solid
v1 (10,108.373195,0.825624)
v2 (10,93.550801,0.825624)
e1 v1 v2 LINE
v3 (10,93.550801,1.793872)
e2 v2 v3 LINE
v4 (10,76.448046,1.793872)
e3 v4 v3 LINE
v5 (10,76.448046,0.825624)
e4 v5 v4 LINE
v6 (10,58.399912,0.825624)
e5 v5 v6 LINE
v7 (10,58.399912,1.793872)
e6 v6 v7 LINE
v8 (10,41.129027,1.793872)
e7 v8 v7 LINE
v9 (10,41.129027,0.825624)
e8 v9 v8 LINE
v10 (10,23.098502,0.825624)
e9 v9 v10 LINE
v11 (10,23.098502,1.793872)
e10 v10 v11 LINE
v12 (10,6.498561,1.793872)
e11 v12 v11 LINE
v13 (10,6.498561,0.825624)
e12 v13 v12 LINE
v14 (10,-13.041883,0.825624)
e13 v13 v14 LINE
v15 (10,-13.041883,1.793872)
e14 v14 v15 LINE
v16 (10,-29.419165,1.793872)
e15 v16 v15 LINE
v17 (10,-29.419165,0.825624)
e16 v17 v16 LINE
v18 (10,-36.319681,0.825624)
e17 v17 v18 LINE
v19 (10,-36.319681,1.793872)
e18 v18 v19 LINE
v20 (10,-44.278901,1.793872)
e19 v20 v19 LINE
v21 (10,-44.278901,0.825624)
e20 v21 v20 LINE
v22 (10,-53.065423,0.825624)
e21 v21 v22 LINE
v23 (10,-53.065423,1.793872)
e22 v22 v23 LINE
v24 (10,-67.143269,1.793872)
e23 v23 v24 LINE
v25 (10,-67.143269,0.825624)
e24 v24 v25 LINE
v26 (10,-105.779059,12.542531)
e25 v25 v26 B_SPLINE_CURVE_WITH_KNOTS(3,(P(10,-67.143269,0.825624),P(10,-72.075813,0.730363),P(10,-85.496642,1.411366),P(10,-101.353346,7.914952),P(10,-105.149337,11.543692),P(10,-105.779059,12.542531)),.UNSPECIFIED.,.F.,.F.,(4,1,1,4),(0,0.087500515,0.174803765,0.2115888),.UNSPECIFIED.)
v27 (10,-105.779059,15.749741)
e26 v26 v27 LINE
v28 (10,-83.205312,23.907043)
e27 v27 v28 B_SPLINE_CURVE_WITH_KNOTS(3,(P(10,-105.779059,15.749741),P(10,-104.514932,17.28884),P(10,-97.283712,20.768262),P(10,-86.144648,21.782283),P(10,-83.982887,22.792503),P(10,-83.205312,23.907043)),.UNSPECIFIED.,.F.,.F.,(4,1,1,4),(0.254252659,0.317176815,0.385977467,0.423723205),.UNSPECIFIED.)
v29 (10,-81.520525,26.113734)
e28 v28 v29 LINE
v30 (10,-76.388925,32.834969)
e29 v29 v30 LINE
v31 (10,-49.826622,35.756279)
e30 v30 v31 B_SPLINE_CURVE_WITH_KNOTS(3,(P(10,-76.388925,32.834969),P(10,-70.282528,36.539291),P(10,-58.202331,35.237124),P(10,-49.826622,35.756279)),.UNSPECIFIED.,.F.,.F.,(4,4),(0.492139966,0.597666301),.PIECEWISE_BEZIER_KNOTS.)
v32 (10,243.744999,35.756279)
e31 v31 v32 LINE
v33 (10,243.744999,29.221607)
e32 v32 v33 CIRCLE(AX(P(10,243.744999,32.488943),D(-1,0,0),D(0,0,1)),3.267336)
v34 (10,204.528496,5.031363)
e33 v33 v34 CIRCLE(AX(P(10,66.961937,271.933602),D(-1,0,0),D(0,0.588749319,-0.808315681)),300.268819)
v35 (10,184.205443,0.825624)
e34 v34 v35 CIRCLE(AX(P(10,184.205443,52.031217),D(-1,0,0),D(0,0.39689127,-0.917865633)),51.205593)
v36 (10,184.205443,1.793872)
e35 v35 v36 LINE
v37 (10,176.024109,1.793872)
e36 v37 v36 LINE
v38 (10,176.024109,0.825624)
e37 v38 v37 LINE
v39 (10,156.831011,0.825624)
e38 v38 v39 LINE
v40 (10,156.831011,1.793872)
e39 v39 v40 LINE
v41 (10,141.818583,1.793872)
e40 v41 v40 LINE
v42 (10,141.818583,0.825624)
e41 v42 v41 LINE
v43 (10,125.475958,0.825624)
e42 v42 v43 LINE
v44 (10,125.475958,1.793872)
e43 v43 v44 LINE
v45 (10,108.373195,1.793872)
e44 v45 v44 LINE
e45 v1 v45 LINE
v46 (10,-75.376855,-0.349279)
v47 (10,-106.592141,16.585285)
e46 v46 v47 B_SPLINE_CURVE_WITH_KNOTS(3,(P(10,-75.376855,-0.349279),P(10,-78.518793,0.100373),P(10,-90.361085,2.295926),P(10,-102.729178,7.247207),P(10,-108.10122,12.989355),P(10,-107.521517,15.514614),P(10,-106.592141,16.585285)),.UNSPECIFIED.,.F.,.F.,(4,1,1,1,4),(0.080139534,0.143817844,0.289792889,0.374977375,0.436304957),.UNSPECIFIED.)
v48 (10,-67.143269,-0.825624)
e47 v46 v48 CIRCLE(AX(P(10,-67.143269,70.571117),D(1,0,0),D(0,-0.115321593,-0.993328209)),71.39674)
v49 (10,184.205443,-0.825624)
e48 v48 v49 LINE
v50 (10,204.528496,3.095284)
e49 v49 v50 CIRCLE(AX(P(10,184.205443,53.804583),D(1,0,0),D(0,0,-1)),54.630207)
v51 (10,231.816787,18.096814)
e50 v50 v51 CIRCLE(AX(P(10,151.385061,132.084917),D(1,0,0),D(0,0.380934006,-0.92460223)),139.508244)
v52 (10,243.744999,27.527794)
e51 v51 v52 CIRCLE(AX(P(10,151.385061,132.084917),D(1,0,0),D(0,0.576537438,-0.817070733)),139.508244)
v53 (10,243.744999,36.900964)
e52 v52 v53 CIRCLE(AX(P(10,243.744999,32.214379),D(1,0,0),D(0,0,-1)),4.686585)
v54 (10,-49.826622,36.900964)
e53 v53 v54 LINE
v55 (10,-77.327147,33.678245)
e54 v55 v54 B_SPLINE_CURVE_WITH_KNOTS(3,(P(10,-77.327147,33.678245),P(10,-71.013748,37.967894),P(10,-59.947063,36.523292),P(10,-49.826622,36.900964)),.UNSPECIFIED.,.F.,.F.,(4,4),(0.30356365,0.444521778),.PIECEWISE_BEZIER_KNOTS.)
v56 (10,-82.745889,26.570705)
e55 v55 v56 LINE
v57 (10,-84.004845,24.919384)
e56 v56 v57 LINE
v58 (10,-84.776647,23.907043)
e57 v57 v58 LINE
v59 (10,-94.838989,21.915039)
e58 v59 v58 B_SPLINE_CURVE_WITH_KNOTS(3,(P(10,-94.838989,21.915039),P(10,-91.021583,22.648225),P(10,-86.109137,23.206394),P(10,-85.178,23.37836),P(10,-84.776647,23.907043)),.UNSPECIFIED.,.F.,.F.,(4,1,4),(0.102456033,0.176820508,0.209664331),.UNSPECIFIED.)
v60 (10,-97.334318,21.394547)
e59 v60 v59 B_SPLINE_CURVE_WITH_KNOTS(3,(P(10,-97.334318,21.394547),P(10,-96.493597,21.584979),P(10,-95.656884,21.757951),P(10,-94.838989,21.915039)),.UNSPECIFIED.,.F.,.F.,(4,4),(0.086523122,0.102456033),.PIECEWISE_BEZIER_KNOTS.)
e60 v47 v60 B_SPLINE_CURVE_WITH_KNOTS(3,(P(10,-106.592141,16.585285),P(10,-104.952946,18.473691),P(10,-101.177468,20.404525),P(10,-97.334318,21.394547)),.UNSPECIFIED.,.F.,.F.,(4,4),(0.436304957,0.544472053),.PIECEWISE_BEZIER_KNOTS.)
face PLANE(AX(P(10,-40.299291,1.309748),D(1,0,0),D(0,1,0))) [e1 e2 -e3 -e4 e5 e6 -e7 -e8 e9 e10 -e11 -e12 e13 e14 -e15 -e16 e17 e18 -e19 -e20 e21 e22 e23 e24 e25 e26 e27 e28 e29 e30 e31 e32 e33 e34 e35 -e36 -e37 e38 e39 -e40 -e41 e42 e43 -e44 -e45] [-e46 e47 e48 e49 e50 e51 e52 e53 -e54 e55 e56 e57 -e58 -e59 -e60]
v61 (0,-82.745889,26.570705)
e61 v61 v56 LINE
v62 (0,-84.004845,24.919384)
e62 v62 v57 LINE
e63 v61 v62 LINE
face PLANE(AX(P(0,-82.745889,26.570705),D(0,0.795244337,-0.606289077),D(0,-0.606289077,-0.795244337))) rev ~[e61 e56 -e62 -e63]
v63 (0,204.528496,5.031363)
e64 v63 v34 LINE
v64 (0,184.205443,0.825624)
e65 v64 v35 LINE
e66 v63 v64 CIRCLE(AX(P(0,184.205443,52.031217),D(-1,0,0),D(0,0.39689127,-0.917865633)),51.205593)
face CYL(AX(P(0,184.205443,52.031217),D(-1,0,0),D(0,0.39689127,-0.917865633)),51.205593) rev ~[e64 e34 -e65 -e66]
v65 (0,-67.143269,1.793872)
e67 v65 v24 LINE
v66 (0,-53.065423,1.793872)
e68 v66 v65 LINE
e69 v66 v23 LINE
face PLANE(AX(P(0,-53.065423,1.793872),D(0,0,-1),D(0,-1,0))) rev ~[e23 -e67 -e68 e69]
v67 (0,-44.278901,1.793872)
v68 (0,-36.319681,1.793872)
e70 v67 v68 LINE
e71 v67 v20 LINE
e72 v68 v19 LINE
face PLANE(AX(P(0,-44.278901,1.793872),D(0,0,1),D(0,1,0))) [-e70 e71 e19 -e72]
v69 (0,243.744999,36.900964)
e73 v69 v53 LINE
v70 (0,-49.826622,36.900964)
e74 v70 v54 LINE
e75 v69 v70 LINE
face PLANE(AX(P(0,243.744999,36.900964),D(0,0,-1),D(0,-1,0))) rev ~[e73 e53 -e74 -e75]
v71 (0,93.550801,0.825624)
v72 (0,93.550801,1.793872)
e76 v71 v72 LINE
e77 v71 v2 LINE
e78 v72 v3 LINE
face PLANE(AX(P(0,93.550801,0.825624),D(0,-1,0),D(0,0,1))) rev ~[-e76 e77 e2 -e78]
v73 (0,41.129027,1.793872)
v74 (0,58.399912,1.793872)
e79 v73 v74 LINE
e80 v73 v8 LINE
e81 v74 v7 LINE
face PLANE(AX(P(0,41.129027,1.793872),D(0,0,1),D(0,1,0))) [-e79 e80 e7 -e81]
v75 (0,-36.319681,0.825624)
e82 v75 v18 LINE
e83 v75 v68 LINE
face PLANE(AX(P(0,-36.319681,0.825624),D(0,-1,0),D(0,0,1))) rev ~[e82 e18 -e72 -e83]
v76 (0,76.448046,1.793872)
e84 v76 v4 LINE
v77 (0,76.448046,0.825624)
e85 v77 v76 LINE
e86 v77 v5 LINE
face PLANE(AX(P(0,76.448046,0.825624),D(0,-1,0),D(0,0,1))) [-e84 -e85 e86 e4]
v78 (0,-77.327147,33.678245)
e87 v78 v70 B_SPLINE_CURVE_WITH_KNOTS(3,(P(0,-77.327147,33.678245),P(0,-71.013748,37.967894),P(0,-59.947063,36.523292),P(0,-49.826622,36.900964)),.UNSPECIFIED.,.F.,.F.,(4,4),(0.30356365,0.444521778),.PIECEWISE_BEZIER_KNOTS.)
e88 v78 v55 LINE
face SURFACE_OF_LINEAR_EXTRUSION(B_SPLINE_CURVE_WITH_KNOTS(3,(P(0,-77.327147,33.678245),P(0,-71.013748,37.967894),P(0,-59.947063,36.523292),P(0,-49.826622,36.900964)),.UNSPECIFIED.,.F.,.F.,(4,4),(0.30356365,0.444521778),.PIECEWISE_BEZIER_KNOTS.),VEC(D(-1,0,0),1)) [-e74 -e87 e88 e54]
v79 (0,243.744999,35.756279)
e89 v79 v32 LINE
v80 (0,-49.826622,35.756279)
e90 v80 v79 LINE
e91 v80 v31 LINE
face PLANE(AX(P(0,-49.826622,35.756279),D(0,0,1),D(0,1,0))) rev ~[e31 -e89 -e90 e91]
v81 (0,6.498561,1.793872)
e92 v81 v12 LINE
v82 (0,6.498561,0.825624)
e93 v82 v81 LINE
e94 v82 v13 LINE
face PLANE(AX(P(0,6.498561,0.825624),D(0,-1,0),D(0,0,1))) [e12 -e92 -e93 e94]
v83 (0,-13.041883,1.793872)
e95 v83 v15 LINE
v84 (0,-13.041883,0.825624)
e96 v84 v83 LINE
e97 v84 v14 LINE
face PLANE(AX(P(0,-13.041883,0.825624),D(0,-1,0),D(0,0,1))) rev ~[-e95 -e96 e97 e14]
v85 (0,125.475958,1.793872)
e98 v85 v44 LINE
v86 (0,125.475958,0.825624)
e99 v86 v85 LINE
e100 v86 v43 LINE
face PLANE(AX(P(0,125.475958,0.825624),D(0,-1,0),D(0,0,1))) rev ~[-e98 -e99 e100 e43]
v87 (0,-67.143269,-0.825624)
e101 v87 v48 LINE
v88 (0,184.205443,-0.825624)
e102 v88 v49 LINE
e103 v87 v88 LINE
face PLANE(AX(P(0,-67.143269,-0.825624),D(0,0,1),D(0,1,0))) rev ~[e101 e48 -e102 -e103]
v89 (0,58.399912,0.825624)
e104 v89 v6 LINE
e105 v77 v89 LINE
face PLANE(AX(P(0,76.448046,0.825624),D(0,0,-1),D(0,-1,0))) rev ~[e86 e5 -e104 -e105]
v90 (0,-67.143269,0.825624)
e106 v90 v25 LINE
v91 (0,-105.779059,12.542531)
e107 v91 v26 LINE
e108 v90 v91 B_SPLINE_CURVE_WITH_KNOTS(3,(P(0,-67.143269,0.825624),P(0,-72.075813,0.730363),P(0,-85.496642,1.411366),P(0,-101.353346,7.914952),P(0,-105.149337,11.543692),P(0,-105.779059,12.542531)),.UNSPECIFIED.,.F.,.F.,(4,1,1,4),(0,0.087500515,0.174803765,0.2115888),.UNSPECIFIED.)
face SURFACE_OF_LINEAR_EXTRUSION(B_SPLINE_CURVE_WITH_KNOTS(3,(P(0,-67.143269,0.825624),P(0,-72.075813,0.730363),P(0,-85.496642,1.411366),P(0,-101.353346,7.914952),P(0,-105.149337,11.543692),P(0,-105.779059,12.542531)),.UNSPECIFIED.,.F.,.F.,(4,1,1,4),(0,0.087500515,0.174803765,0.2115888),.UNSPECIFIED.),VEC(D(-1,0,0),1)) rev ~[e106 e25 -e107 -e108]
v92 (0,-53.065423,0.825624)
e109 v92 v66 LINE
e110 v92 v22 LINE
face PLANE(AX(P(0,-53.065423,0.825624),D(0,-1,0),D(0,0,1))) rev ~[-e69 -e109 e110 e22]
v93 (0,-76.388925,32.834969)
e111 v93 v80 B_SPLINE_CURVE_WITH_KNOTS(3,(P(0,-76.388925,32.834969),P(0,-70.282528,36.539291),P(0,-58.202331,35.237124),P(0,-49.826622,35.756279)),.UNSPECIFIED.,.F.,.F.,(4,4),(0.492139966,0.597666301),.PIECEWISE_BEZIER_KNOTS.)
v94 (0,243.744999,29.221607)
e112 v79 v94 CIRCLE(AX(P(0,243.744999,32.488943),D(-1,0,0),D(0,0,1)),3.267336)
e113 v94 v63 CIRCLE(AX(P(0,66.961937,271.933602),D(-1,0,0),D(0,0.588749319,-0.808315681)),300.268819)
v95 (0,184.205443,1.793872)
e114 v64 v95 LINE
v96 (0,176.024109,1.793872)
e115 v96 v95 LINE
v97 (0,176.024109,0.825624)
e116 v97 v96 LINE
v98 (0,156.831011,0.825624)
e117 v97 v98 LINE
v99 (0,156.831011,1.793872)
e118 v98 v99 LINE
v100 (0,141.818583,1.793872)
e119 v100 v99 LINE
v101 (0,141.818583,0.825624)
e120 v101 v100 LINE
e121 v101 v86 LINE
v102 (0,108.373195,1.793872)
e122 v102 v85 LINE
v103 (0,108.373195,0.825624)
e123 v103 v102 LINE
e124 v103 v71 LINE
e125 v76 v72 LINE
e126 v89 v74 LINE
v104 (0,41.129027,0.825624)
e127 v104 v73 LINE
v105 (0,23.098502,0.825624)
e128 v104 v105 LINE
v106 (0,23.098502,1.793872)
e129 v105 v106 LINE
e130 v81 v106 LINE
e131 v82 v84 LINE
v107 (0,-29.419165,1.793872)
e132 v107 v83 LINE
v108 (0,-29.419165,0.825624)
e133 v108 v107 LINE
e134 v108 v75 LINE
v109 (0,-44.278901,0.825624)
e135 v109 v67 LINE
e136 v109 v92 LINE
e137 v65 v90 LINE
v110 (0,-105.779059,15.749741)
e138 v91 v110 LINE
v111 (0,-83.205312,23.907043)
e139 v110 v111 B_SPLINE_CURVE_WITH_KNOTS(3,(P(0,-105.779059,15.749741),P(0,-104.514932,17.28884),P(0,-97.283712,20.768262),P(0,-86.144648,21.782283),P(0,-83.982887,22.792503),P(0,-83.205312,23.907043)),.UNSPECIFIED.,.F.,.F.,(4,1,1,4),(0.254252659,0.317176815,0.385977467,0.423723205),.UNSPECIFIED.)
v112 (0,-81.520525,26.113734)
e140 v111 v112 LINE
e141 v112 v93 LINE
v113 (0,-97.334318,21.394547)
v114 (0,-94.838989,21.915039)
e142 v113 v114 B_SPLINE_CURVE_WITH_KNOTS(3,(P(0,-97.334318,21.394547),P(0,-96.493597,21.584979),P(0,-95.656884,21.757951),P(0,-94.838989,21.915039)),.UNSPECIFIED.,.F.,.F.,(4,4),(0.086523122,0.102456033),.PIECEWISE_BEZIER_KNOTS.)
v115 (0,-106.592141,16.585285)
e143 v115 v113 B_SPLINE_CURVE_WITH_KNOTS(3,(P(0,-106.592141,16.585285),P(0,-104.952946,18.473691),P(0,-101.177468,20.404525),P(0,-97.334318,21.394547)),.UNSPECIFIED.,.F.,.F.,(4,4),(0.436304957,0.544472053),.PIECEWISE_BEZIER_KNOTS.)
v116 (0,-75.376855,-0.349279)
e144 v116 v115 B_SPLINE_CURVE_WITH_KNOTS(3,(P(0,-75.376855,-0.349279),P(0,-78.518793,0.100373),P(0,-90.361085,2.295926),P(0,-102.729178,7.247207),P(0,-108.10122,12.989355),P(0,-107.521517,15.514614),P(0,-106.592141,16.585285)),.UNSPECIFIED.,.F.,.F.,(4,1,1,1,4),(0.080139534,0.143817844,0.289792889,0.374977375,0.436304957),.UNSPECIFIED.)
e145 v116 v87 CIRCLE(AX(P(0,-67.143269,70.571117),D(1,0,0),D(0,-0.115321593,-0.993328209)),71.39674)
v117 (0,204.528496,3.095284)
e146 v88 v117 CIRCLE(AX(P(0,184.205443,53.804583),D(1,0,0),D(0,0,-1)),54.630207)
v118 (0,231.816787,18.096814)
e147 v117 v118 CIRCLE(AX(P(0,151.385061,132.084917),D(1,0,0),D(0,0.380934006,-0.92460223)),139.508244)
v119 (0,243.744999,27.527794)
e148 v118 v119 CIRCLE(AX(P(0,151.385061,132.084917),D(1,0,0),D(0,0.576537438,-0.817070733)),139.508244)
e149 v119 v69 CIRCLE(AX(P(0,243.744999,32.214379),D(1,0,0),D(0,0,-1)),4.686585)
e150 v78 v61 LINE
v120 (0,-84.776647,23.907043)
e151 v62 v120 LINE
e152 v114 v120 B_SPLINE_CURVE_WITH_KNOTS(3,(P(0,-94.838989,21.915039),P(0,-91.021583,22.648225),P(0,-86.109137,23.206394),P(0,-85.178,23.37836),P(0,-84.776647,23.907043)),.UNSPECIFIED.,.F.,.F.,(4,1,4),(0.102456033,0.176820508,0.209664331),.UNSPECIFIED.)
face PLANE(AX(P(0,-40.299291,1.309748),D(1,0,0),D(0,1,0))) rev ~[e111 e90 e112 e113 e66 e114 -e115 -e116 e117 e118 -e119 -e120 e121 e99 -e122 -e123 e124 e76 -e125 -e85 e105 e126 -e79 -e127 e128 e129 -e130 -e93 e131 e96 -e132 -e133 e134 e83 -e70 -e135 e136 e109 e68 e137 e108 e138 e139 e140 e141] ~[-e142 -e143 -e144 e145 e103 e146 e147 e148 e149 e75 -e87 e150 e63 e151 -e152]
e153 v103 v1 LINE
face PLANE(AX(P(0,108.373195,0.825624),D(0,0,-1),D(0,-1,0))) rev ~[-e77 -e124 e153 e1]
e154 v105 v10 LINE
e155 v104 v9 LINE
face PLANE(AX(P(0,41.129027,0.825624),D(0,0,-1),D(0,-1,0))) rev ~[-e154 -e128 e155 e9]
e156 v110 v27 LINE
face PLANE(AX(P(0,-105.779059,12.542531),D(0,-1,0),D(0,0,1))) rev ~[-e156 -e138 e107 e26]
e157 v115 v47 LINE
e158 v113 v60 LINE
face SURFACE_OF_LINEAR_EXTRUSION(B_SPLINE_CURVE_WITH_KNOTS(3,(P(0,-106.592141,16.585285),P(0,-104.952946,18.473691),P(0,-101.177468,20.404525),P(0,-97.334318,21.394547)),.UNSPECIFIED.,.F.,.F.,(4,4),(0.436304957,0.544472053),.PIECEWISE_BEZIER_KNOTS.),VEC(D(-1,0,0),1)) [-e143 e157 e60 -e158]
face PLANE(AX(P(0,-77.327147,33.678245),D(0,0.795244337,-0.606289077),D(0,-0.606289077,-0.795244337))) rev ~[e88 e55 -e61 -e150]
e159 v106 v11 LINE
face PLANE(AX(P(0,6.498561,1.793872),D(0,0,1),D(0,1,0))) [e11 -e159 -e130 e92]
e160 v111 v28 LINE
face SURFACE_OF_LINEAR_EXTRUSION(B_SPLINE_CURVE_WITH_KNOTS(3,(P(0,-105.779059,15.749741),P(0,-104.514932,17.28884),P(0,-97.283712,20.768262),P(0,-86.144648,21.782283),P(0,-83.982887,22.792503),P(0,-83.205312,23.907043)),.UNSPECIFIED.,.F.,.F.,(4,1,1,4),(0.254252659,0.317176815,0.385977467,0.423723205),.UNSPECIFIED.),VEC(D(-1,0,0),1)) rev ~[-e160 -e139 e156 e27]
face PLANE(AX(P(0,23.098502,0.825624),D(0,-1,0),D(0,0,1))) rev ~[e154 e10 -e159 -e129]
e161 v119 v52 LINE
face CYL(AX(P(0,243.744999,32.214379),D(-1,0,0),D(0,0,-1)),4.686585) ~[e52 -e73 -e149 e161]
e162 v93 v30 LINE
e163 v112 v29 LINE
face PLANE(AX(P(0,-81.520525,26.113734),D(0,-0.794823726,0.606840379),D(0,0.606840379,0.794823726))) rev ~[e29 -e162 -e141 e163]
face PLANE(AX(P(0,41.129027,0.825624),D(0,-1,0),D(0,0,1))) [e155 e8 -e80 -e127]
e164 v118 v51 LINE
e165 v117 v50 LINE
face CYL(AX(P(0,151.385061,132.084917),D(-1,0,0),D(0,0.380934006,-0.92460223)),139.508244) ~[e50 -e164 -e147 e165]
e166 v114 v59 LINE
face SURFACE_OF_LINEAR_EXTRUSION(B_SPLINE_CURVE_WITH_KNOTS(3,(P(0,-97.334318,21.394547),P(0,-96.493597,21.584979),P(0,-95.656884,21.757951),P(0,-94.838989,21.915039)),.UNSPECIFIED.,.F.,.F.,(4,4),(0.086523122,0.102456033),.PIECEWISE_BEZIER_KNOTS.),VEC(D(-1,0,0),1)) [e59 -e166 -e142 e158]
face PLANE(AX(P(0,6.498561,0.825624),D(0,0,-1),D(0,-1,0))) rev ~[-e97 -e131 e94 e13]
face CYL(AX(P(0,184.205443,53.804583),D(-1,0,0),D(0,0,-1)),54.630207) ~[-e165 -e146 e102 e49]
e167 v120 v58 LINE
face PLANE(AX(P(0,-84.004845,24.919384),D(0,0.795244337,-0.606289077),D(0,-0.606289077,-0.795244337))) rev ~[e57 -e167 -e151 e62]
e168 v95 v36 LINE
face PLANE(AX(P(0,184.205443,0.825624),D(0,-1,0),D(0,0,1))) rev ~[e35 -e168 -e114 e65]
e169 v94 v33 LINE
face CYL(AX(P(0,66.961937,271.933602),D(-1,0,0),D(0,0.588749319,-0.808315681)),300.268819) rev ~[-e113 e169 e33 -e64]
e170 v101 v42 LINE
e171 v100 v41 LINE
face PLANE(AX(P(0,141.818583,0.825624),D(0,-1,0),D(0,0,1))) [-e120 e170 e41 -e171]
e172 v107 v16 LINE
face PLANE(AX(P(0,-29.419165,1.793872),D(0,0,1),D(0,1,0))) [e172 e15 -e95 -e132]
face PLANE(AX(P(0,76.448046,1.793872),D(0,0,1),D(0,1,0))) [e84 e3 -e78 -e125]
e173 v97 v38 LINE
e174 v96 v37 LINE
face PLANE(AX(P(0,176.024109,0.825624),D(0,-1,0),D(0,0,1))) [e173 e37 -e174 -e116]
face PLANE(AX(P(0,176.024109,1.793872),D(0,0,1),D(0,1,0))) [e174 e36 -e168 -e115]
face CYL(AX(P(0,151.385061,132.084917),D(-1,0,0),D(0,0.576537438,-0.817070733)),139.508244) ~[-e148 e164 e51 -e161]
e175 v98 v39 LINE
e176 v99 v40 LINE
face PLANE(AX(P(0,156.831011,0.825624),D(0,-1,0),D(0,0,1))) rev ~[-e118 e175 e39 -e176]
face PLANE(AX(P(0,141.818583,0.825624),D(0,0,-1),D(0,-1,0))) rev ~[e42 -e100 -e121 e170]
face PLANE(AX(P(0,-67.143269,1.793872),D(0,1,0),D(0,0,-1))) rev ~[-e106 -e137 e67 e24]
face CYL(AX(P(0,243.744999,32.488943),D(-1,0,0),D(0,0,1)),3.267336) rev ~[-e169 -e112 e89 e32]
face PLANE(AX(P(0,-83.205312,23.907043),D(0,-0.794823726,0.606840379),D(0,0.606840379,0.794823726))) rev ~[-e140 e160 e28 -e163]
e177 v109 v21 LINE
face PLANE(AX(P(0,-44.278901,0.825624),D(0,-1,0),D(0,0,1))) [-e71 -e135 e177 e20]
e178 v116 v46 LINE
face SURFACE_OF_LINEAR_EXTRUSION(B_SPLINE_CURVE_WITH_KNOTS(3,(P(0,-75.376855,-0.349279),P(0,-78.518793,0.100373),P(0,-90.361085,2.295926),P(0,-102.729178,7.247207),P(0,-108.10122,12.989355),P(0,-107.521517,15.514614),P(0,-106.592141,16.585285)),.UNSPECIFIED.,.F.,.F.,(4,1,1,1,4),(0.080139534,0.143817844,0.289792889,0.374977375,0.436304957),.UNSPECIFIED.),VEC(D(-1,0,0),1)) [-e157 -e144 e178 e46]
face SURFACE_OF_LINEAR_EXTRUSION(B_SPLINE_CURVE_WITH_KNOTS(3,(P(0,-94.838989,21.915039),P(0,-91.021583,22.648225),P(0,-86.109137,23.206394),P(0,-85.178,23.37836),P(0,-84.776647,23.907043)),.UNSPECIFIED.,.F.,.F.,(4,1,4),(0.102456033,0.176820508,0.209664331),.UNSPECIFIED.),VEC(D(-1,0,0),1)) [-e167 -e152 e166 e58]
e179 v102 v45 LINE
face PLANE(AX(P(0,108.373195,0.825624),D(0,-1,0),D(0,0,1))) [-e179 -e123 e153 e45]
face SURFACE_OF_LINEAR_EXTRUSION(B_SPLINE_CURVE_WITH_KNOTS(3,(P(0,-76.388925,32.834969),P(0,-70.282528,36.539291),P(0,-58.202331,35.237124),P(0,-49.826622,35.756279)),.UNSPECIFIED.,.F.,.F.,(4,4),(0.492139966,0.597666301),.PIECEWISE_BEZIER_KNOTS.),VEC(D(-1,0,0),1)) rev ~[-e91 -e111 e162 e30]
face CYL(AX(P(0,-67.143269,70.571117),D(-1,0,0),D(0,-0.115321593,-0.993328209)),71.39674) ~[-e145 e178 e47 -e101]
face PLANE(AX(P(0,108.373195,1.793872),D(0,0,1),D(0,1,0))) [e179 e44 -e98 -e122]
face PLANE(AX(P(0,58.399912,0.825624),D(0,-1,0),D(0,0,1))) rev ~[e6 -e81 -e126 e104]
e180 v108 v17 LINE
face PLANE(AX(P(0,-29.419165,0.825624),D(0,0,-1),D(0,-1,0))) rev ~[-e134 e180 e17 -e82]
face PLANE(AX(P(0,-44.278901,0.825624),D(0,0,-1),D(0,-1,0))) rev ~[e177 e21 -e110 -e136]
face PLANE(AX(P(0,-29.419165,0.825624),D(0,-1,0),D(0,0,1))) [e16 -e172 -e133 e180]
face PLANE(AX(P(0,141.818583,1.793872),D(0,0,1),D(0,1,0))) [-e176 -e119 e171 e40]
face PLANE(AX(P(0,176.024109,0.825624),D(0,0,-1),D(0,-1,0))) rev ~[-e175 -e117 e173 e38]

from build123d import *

# Parameters (mm, degrees)
F0_W     = 7.9592205584
F0_H     = 0.9682481177
F0_W_2   = 16.3772823289
F0_W_3   = 16.5999415331
F0_W_4   = 59.5395565033
F0_H_2   = 1.1446848512
F0_W_5   = 17.2708854079
F0_W_6   = 17.1027556062
F0_W_7   = 8.1813335419
F0_W_8   = 17.1027630568
F0_W_9   = 15.0124281645
F1_DEPTH = 10


with BuildPart() as f1:
    # F0 (on Right) → F1 (new body)
    with BuildSketch(Plane.YZ):
        with Locations((-40.2992907912, 1.3097476913)):
            Rectangle(F0_W, F0_H)
        with BuildLine():
            Line((-36.319680512, 0.8256236324), (-44.2789010704, 0.8256236324))
            Line((-44.2789010704, 0.8256236324), (-47.2884887369, 0.8256236324))
            add(Edge.make_bspline(
                [(-47.2884887369, 0.8256236324), (-51.1986791226, -0.4227987286), (-54.7682639191, 0.488674187), (-57.7987805009, 0.8256236324)],
                knots=[0.8788153386, 0.8788153386, 0.8788153386, 0.8788153386, 0.9375977313, 0.9375977313, 0.9375977313, 0.9375977313], degree=3))
            Line((-57.7987805009, 0.8256236324), (-67.1432688832, 0.8256236324))
            add(Edge.make_bspline(
                [(-67.1432688832, 0.8256236324), (-66.6509193776, -0.3373995266), (-66.5816717743, -0.6583984415), (-67.1432688832, -0.8256236324)],
                knots=[0.9569663892, 0.9569663892, 0.9569663892, 0.9569663892, 1, 1, 1, 1], degree=3))
            Line((-67.1432688832, -0.8256236324), (67.1432688832, -0.8256236324))
            Line((67.1432688832, -0.8256236324), (67.1432688832, 0.8256236324))
            Line((67.1432688832, 0.8256236324), (58.3999119699, 0.8256236324))
            Line((58.3999119699, 0.8256236324), (41.129026562, 0.8256236324))
            Line((41.129026562, 0.8256236324), (23.0985023081, 0.8256236324))
            Line((23.0985023081, 0.8256236324), (6.4985607751, 0.8256236324))
            Line((6.4985607751, 0.8256236324), (-13.0418827757, 0.8256236324))
            Line((-13.0418827757, 0.8256236324), (-29.4191651046, 0.8256236324))
            Line((-29.4191651046, 0.8256236324), (-36.319680512, 0.8256236324))
        make_face()
        with BuildLine():
            add(Edge.make_bspline(
                [(-47.2884887369, 0.8256236324), (-51.1986791226, -0.4227987286), (-54.7682639191, 0.488674187), (-57.7987805009, 0.8256236324)],
                knots=[0.8788153386, 0.8788153386, 0.8788153386, 0.8788153386, 0.9375977313, 0.9375977313, 0.9375977313, 0.9375977313], degree=3))
            Line((-47.2884887369, 0.8256236324), (-53.0654229224, 0.8256236324))
            Line((-53.0654229224, 0.8256236324), (-57.7987805009, 0.8256236324))
        make_face()
        with Locations((-21.2305239402, 1.3097476913)):
            Rectangle(F0_W_2, F0_H)
        with BuildLine():
            Line((-57.7987805009, 0.8256236324), (-53.0654229224, 0.8256236324))
            Line((-53.0654229224, 0.8256236324), (-53.0654229224, 1.7938717501))
            Line((-53.0654229224, 1.7938717501), (-67.1432688832, 1.7938717501))
            Line((-67.1432688832, 1.7938717501), (-67.1432688832, 0.8256236324))
            add(Edge.make_bspline(
                [(-57.7987805009, 0.8256236324), (-61.0159191969, 1.1833227475), (-63.6255527419, 0.8935602649), (-67.1432688832, 0.8256236324)],
                knots=[0.9375977313, 0.9375977313, 0.9375977313, 0.9375977313, 1, 1, 1, 1], degree=3))
        make_face()
        with BuildLine():
            Line((-67.1432688832, 0.8256236324), (-57.7987805009, 0.8256236324))
            add(Edge.make_bspline(
                [(-57.7987805009, 0.8256236324), (-61.0159191969, 1.1833227475), (-63.6255527419, 0.8935602649), (-67.1432688832, 0.8256236324)],
                knots=[0.9375977313, 0.9375977313, 0.9375977313, 0.9375977313, 1, 1, 1, 1], degree=3))
        make_face()
        with BuildLine():
            add(Edge.make_bspline(
                [(-67.1432688832, 0.8256236324), (-66.6509193776, -0.3373995266), (-66.5816717743, -0.6583984415), (-67.1432688832, -0.8256236324)],
                knots=[0.9569663892, 0.9569663892, 0.9569663892, 0.9569663892, 1, 1, 1, 1], degree=3))
            Line((-67.1432688832, 0.8256236324), (-67.1432688832, -0.8256236324))
        make_face()
        with BuildLine():
            Line((-67.1432688832, -0.8256236324), (-67.1432688832, 0.8256236324))
            add(Edge.make_bspline(
                [(-67.1432688832, 0.8256236324), (-72.0758134657, 0.7303628282), (-85.4966418977, 1.4113661542), (-101.3533463283, 7.9149516327), (-105.1493369808, 11.5436915404), (-105.7790592313, 12.5425305242)],
                knots=[0, 0, 0, 0, 0.0875005146, 0.1748037653, 0.2115887997, 0.2115887997, 0.2115887997, 0.2115887997], degree=3))
            add(Edge.make_bspline(
                [(-105.7790592313, 12.5425305242), (-105.9744112307, 12.8523896605), (-106.4393049893, 13.8046586359), (-106.4279219113, 14.6656665162), (-106.1115412671, 15.2586876195)],
                knots=[0.2115887997, 0.2115887997, 0.2115887997, 0.2115887997, 0.2230002275, 0.2475165519, 0.2475165519, 0.2475165519, 0.2475165519], degree=3))
            add(Edge.make_bspline(
                [(-106.1115412671, 15.2586876195), (-106.4280364897, 15.7186574339), (-106.5937697782, 16.1640910139), (-106.5921410918, 16.585284844)],
                knots=[0.9836293826, 0.9836293826, 0.9836293826, 0.9836293826, 1, 1, 1, 1], degree=3))
            add(Edge.make_bspline(
                [(-75.376854734, -0.3492794788), (-78.5187930994, 0.100372638), (-90.3610848386, 2.295926245), (-102.7291777595, 7.2472073243), (-108.1012203128, 12.9893553032), (-107.5215165975, 15.5146137824), (-106.5921410918, 16.585284844)],
                knots=[0.0801395338, 0.0801395338, 0.0801395338, 0.0801395338, 0.1438178441, 0.2897928885, 0.3749773752, 0.4363049571, 0.4363049571, 0.4363049571, 0.4363049571], degree=3))
            ThreePointArc((-75.376854734, -0.3492794788), (-71.2669456321, -0.7064381134), (-67.1432688832, -0.8256236324))
        make_face()
        with Locations((14.7985315416, 1.3097476913)):
            Rectangle(F0_W_3, F0_H)
        with BuildLine():
            Line((-49.8266220093, 35.7562787831), (-29.3324157713, 35.7562787831))
            add(Edge.make_bspline(
                [(-31.3463312427, 36.9009636343), (-30.6162211649, 36.6342598411), (-29.9359409959, 36.264957093), (-29.3600573473, 35.7800296462), (-29.3324157713, 35.7562787831)],
                knots=[0.5476252208, 0.5476252208, 0.5476252208, 0.5476252208, 0.5656279815, 0.5665441357, 0.5665441357, 0.5665441357, 0.5665441357], degree=3))
            Line((-31.3463312427, 36.9009636343), (-41.4767201262, 36.9009636343))
            add(Edge.make_bspline(
                [(-49.8266220093, 35.7562787831), (-46.6034582942, 35.95606144), (-43.9288870011, 36.4255610772), (-41.4767201262, 36.9009636343)],
                knots=[0.5976663005, 0.5976663005, 0.5976663005, 0.5976663005, 0.6382752389, 0.6382752389, 0.6382752389, 0.6382752389], degree=3))
        make_face()
        with BuildLine():
            add(Edge.make_bspline(
                [(-31.3463312427, 36.9009636343), (-30.6162211649, 36.6342598411), (-29.9359409959, 36.264957093), (-29.3600573473, 35.7800296462), (-29.3324157713, 35.7562787831)],
                knots=[0.5476252208, 0.5476252208, 0.5476252208, 0.5476252208, 0.5656279815, 0.5665441357, 0.5665441357, 0.5665441357, 0.5665441357], degree=3))
            Line((-29.3324157713, 35.7562787831), (-27.0790393766, 35.7562787831))
            add(Edge.make_bspline(
                [(-27.9329801586, 36.9009636343), (-27.5874335917, 36.590939793), (-27.2981663641, 36.213302791), (-27.0790393766, 35.7562787831)],
                knots=[0.7220869644, 0.7220869644, 0.7220869644, 0.7220869644, 0.7320653179, 0.7320653179, 0.7320653179, 0.7320653179], degree=3))
            Line((-27.9329801586, 36.9009636343), (-31.3463312427, 36.9009636343))
        make_face()
        with BuildLine():
            add(Edge.make_bspline(
                [(-27.9329801586, 36.9009636343), (-27.5874335917, 36.590939793), (-27.2981663641, 36.213302791), (-27.0790393766, 35.7562787831)],
                knots=[0.7220869644, 0.7220869644, 0.7220869644, 0.7220869644, 0.7320653179, 0.7320653179, 0.7320653179, 0.7320653179], degree=3))
            Line((-27.0790393766, 35.7562787831), (184.205442667, 35.7562787831))
            Line((184.205442667, 35.7562787831), (184.205442667, 36.9009636343))
            Line((184.205442667, 36.9009636343), (-27.9329801586, 36.9009636343))
        make_face()
        with BuildLine():
            Line((-83.2053124905, 23.9070430398), (-81.5205250131, 26.1137338048))
            add(Edge.make_bspline(
                [(-81.8276049313, 26.3324605583), (-81.7285806251, 26.2701481945), (-81.6261511228, 26.1970663843), (-81.5205250131, 26.1137338048)],
                knots=[0.7832802469, 0.7832802469, 0.7832802469, 0.7832802469, 0.7877852316, 0.7877852316, 0.7877852316, 0.7877852316], degree=3))
            add(Edge.make_bspline(
                [(-83.2053124905, 23.9070430398), (-82.7734139474, 24.5261063334), (-82.337894388, 25.3786099624), (-81.8276049313, 26.3324605583)],
                knots=[0.4237232055, 0.4237232055, 0.4237232055, 0.4237232055, 0.4446888147, 0.4446888147, 0.4446888147, 0.4446888147], degree=3))
        make_face()
        with BuildLine():
            add(Edge.make_bspline(
                [(-81.8276049313, 26.3324605583), (-81.7285806251, 26.2701481945), (-81.6261511228, 26.1970663843), (-81.5205250131, 26.1137338048)],
                knots=[0.7832802469, 0.7832802469, 0.7832802469, 0.7832802469, 0.7877852316, 0.7877852316, 0.7877852316, 0.7877852316], degree=3))
            Line((-81.5205250131, 26.1137338048), (-76.3889253139, 32.834969461))
            add(Edge.make_bspline(
                [(-81.8276049313, 26.3324605583), (-80.6726743978, 28.4912964173), (-79.1347380919, 31.1692780126), (-76.3889253139, 32.834969461)],
                knots=[0.4446888147, 0.4446888147, 0.4446888147, 0.4446888147, 0.4921399658, 0.4921399658, 0.4921399658, 0.4921399658], degree=3))
        make_face()
        with BuildLine():
            Line((-105.7790592313, 12.5425305242), (-105.7790592313, 14.8325555243))
            add(Edge.make_bspline(
                [(-105.7790592313, 14.8325555243), (-105.9036909626, 14.9757756925), (-106.0146769352, 15.1179124494), (-106.1115412671, 15.2586876195)],
                knots=[0.978619105, 0.978619105, 0.978619105, 0.978619105, 0.9836293826, 0.9836293826, 0.9836293826, 0.9836293826], degree=3))
            add(Edge.make_bspline(
                [(-105.7790592313, 12.5425305242), (-105.9744112307, 12.8523896605), (-106.4393049893, 13.8046586359), (-106.4279219113, 14.6656665162), (-106.1115412671, 15.2586876195)],
                knots=[0.2115887997, 0.2115887997, 0.2115887997, 0.2115887997, 0.2230002275, 0.2475165519, 0.2475165519, 0.2475165519, 0.2475165519], degree=3))
        make_face()
        with BuildLine():
            add(Edge.make_bspline(
                [(-105.7790592313, 14.8325555243), (-105.9036909626, 14.9757756925), (-106.0146769352, 15.1179124494), (-106.1115412671, 15.2586876195)],
                knots=[0.978619105, 0.978619105, 0.978619105, 0.978619105, 0.9836293826, 0.9836293826, 0.9836293826, 0.9836293826], degree=3))
            Line((-105.7790592313, 14.8325555243), (-105.7790592313, 15.7497413456))
            add(Edge.make_bspline(
                [(-106.1115412671, 15.2586876195), (-106.0246124997, 15.4216261385), (-105.9143855758, 15.5849789536), (-105.7790592313, 15.7497413456)],
                knots=[0.2475165519, 0.2475165519, 0.2475165519, 0.2475165519, 0.2542526589, 0.2542526589, 0.2542526589, 0.2542526589], degree=3))
        make_face()
        with BuildLine():
            Line((-49.8266220093, 36.9009636343), (-49.8266220093, 35.7562787831))
            add(Edge.make_bspline(
                [(-49.8266220093, 35.7562787831), (-46.6034582942, 35.95606144), (-43.9288870011, 36.4255610772), (-41.4767201262, 36.9009636343)],
                knots=[0.5976663005, 0.5976663005, 0.5976663005, 0.5976663005, 0.6382752389, 0.6382752389, 0.6382752389, 0.6382752389], degree=3))
            Line((-41.4767201262, 36.9009636343), (-49.8266220093, 36.9009636343))
        make_face()
        with BuildLine():
            add(Edge.make_bspline(
                [(-76.3889253139, 32.834969461), (-70.2825284986, 36.5392908326), (-58.2023310565, 35.23712383), (-49.8266220093, 35.7562787831)],
                knots=[0.4921399658, 0.4921399658, 0.4921399658, 0.4921399658, 0.5976663005, 0.5976663005, 0.5976663005, 0.5976663005], degree=3))
            Line((-49.8266220093, 35.7562787831), (-49.8266220093, 36.9009636343))
            add(Edge.make_bspline(
                [(-77.3271471262, 33.6782447994), (-71.0137479896, 37.9678944533), (-59.9470632222, 36.5232924918), (-49.8266220093, 36.9009636343)],
                knots=[0.3035636496, 0.3035636496, 0.3035636496, 0.3035636496, 0.4445217782, 0.4445217782, 0.4445217782, 0.4445217782], degree=3))
            Line((-77.3271471262, 33.6782447994), (-82.7458889947, 26.570704936))
            add(Edge.make_bspline(
                [(-82.7458889947, 26.570704936), (-82.6409378067, 26.595297775), (-82.3634844697, 26.6047383627), (-82.0375313521, 26.4645595549), (-81.8276049313, 26.3324605583)],
                knots=[0.767285406, 0.767285406, 0.767285406, 0.767285406, 0.7737299116, 0.7832802469, 0.7832802469, 0.7832802469, 0.7832802469], degree=3))
            add(Edge.make_bspline(
                [(-81.8276049313, 26.3324605583), (-80.6726743978, 28.4912964173), (-79.1347380919, 31.1692780126), (-76.3889253139, 32.834969461)],
                knots=[0.4446888147, 0.4446888147, 0.4446888147, 0.4446888147, 0.4921399658, 0.4921399658, 0.4921399658, 0.4921399658], degree=3))
        make_face()
        with Locations((213.9752209187, 36.3286212087)):
            Rectangle(F0_W_4, F0_H_2)
        with BuildLine():
            add(Edge.make_bspline(
                [(-83.2053124905, 23.9070430398), (-82.7734139474, 24.5261063334), (-82.337894388, 25.3786099624), (-81.8276049313, 26.3324605583)],
                knots=[0.4237232055, 0.4237232055, 0.4237232055, 0.4237232055, 0.4446888147, 0.4446888147, 0.4446888147, 0.4446888147], degree=3))
            add(Edge.make_bspline(
                [(-82.7458889947, 26.570704936), (-82.6409378067, 26.595297775), (-82.3634844697, 26.6047383627), (-82.0375313521, 26.4645595549), (-81.8276049313, 26.3324605583)],
                knots=[0.767285406, 0.767285406, 0.767285406, 0.767285406, 0.7737299116, 0.7832802469, 0.7832802469, 0.7832802469, 0.7832802469], degree=3))
            Line((-82.7458889947, 26.570704936), (-84.0048450328, 24.9193843076))
            add(Edge.make_bspline(
                [(-94.8389886697, 21.9150389209), (-91.9546645853, 22.3878238509), (-87.3974074928, 22.4492787894), (-84.977370385, 22.3216318756), (-84.2595160002, 24.3097150361), (-84.0048450328, 24.9193843076)],
                knots=[0.5679522733, 0.5679522733, 0.5679522733, 0.5679522733, 0.6501774444, 0.7059587467, 0.7326988833, 0.7326988833, 0.7326988833, 0.7326988833], degree=3))
            add(Edge.make_bspline(
                [(-97.3343178856, 21.3945470699), (-96.4935969707, 21.584978542), (-95.6568843275, 21.7579506298), (-94.8389886865, 21.9150389176)],
                knots=[0.0865231218, 0.0865231218, 0.0865231218, 0.0865231218, 0.1024560332, 0.1024560332, 0.1024560332, 0.1024560332], degree=3))
            add(Edge.make_bspline(
                [(-106.5921410918, 16.585284844), (-104.9529463621, 18.4736909304), (-101.1774679584, 20.4045249526), (-97.3343178855, 21.3945470692)],
                knots=[0.4363049571, 0.4363049571, 0.4363049571, 0.4363049571, 0.5444720527, 0.5444720527, 0.5444720527, 0.5444720527], degree=3))
            add(Edge.make_bspline(
                [(-106.1115412671, 15.2586876195), (-106.4280364897, 15.7186574339), (-106.5937697782, 16.1640910139), (-106.5921410918, 16.585284844)],
                knots=[0.9836293826, 0.9836293826, 0.9836293826, 0.9836293826, 1, 1, 1, 1], degree=3))
            add(Edge.make_bspline(
                [(-106.1115412671, 15.2586876195), (-106.0246124997, 15.4216261385), (-105.9143855758, 15.5849789536), (-105.7790592313, 15.7497413456)],
                knots=[0.2475165519, 0.2475165519, 0.2475165519, 0.2475165519, 0.2542526589, 0.2542526589, 0.2542526589, 0.2542526589], degree=3))
            add(Edge.make_bspline(
                [(-105.7790592313, 15.7497413456), (-104.5149320358, 17.2888401911), (-97.2837116626, 20.7682618377), (-86.1446484374, 21.7822829697), (-83.9828873041, 22.7925034497), (-83.2053124905, 23.9070430398)],
                knots=[0.2542526589, 0.2542526589, 0.2542526589, 0.2542526589, 0.3171768152, 0.3859774667, 0.4237232055, 0.4237232055, 0.4237232055, 0.4237232055], degree=3))
        make_face()
        Polygon((67.1432688832, 0.8256236324), (67.1432688832, -0.8256236324), (184.205442667, -0.8256236324), (184.205442667, 0.8256236324), (176.0241091251, 0.8256236324), (156.8310111761, 0.8256236324), (141.8185830116, 0.8256236324), (125.4759579897, 0.8256236324), (108.3731949329, 0.8256236324), (93.5508012772, 0.8256236324), (76.448045671, 0.8256236324), align=None)
        with Locations((49.7644692659, 1.3097476913)):
            Rectangle(F0_W_5, F0_H)
        with BuildLine():
            Line((243.7449991703, 36.9009636343), (243.7449991703, 35.7562787831))
            ThreePointArc((243.7449991703, 35.7562787831), (247.0123348758, 32.4889430776), (243.7449991703, 29.2216073722))
            Line((243.7449991703, 29.2216073722), (243.7449991703, 27.5277942419))
            ThreePointArc((243.7449991703, 27.5277942419), (248.4315838665, 32.2143789381), (243.7449991703, 36.9009636343))
        make_face()
        with BuildLine():
            Line((184.205442667, 0.8256236324), (184.205442667, -0.8256236324))
            ThreePointArc((184.205442667, -0.8256236324), (194.5543556633, 0.1635588042), (204.5284956694, 3.0952841043))
            ThreePointArc((204.5284956694, 3.0952841043), (218.592518618, 9.8322781675), (231.8167869207, 18.0968143531))
            ThreePointArc((231.8167869207, 18.0968143531), (237.9094832192, 22.6496646882), (243.7449991703, 27.5277942419))
            Line((243.7449991703, 27.5277942419), (243.7449991703, 29.2216073722))
            ThreePointArc((243.7449991703, 29.2216073722), (224.6014403462, 16.3731386899), (204.5284956694, 5.0313626416))
            ThreePointArc((204.5284956694, 5.0313626416), (194.5822765284, 1.8880807661), (184.205442667, 0.8256236324))
        make_face()
        with BuildLine():
            add(Edge.make_bspline(
                [(-94.8389886697, 21.9150389209), (-91.9546645853, 22.3878238509), (-87.3974074928, 22.4492787894), (-84.977370385, 22.3216318756), (-84.2595160002, 24.3097150361), (-84.0048450328, 24.9193843076)],
                knots=[0.5679522733, 0.5679522733, 0.5679522733, 0.5679522733, 0.6501774444, 0.7059587467, 0.7326988833, 0.7326988833, 0.7326988833, 0.7326988833], degree=3))
            Line((-84.0048450328, 24.9193843076), (-84.7766473889, 23.9070430398))
            add(Edge.make_bspline(
                [(-94.8389886697, 21.9150389209), (-91.0215834223, 22.6482249451), (-86.1091370373, 23.2063937055), (-85.1780004227, 23.3783596749), (-84.7766473889, 23.9070430398)],
                knots=[0.1024560332, 0.1024560332, 0.1024560332, 0.1024560332, 0.1768205078, 0.2096643307, 0.2096643307, 0.2096643307, 0.2096643307], degree=3))
        make_face()
        with Locations((84.9994234741, 1.3097476913)):
            Rectangle(F0_W_6, F0_H)
        with Locations((180.1147758961, 1.3097476913)):
            Rectangle(F0_W_7, F0_H)
        with Locations((116.9245764613, 1.3097476913)):
            Rectangle(F0_W_8, F0_H)
        with Locations((149.3247970939, 1.3097476913)):
            Rectangle(F0_W_9, F0_H)
    extrude(amount=F1_DEPTH)


solid = f1.part
